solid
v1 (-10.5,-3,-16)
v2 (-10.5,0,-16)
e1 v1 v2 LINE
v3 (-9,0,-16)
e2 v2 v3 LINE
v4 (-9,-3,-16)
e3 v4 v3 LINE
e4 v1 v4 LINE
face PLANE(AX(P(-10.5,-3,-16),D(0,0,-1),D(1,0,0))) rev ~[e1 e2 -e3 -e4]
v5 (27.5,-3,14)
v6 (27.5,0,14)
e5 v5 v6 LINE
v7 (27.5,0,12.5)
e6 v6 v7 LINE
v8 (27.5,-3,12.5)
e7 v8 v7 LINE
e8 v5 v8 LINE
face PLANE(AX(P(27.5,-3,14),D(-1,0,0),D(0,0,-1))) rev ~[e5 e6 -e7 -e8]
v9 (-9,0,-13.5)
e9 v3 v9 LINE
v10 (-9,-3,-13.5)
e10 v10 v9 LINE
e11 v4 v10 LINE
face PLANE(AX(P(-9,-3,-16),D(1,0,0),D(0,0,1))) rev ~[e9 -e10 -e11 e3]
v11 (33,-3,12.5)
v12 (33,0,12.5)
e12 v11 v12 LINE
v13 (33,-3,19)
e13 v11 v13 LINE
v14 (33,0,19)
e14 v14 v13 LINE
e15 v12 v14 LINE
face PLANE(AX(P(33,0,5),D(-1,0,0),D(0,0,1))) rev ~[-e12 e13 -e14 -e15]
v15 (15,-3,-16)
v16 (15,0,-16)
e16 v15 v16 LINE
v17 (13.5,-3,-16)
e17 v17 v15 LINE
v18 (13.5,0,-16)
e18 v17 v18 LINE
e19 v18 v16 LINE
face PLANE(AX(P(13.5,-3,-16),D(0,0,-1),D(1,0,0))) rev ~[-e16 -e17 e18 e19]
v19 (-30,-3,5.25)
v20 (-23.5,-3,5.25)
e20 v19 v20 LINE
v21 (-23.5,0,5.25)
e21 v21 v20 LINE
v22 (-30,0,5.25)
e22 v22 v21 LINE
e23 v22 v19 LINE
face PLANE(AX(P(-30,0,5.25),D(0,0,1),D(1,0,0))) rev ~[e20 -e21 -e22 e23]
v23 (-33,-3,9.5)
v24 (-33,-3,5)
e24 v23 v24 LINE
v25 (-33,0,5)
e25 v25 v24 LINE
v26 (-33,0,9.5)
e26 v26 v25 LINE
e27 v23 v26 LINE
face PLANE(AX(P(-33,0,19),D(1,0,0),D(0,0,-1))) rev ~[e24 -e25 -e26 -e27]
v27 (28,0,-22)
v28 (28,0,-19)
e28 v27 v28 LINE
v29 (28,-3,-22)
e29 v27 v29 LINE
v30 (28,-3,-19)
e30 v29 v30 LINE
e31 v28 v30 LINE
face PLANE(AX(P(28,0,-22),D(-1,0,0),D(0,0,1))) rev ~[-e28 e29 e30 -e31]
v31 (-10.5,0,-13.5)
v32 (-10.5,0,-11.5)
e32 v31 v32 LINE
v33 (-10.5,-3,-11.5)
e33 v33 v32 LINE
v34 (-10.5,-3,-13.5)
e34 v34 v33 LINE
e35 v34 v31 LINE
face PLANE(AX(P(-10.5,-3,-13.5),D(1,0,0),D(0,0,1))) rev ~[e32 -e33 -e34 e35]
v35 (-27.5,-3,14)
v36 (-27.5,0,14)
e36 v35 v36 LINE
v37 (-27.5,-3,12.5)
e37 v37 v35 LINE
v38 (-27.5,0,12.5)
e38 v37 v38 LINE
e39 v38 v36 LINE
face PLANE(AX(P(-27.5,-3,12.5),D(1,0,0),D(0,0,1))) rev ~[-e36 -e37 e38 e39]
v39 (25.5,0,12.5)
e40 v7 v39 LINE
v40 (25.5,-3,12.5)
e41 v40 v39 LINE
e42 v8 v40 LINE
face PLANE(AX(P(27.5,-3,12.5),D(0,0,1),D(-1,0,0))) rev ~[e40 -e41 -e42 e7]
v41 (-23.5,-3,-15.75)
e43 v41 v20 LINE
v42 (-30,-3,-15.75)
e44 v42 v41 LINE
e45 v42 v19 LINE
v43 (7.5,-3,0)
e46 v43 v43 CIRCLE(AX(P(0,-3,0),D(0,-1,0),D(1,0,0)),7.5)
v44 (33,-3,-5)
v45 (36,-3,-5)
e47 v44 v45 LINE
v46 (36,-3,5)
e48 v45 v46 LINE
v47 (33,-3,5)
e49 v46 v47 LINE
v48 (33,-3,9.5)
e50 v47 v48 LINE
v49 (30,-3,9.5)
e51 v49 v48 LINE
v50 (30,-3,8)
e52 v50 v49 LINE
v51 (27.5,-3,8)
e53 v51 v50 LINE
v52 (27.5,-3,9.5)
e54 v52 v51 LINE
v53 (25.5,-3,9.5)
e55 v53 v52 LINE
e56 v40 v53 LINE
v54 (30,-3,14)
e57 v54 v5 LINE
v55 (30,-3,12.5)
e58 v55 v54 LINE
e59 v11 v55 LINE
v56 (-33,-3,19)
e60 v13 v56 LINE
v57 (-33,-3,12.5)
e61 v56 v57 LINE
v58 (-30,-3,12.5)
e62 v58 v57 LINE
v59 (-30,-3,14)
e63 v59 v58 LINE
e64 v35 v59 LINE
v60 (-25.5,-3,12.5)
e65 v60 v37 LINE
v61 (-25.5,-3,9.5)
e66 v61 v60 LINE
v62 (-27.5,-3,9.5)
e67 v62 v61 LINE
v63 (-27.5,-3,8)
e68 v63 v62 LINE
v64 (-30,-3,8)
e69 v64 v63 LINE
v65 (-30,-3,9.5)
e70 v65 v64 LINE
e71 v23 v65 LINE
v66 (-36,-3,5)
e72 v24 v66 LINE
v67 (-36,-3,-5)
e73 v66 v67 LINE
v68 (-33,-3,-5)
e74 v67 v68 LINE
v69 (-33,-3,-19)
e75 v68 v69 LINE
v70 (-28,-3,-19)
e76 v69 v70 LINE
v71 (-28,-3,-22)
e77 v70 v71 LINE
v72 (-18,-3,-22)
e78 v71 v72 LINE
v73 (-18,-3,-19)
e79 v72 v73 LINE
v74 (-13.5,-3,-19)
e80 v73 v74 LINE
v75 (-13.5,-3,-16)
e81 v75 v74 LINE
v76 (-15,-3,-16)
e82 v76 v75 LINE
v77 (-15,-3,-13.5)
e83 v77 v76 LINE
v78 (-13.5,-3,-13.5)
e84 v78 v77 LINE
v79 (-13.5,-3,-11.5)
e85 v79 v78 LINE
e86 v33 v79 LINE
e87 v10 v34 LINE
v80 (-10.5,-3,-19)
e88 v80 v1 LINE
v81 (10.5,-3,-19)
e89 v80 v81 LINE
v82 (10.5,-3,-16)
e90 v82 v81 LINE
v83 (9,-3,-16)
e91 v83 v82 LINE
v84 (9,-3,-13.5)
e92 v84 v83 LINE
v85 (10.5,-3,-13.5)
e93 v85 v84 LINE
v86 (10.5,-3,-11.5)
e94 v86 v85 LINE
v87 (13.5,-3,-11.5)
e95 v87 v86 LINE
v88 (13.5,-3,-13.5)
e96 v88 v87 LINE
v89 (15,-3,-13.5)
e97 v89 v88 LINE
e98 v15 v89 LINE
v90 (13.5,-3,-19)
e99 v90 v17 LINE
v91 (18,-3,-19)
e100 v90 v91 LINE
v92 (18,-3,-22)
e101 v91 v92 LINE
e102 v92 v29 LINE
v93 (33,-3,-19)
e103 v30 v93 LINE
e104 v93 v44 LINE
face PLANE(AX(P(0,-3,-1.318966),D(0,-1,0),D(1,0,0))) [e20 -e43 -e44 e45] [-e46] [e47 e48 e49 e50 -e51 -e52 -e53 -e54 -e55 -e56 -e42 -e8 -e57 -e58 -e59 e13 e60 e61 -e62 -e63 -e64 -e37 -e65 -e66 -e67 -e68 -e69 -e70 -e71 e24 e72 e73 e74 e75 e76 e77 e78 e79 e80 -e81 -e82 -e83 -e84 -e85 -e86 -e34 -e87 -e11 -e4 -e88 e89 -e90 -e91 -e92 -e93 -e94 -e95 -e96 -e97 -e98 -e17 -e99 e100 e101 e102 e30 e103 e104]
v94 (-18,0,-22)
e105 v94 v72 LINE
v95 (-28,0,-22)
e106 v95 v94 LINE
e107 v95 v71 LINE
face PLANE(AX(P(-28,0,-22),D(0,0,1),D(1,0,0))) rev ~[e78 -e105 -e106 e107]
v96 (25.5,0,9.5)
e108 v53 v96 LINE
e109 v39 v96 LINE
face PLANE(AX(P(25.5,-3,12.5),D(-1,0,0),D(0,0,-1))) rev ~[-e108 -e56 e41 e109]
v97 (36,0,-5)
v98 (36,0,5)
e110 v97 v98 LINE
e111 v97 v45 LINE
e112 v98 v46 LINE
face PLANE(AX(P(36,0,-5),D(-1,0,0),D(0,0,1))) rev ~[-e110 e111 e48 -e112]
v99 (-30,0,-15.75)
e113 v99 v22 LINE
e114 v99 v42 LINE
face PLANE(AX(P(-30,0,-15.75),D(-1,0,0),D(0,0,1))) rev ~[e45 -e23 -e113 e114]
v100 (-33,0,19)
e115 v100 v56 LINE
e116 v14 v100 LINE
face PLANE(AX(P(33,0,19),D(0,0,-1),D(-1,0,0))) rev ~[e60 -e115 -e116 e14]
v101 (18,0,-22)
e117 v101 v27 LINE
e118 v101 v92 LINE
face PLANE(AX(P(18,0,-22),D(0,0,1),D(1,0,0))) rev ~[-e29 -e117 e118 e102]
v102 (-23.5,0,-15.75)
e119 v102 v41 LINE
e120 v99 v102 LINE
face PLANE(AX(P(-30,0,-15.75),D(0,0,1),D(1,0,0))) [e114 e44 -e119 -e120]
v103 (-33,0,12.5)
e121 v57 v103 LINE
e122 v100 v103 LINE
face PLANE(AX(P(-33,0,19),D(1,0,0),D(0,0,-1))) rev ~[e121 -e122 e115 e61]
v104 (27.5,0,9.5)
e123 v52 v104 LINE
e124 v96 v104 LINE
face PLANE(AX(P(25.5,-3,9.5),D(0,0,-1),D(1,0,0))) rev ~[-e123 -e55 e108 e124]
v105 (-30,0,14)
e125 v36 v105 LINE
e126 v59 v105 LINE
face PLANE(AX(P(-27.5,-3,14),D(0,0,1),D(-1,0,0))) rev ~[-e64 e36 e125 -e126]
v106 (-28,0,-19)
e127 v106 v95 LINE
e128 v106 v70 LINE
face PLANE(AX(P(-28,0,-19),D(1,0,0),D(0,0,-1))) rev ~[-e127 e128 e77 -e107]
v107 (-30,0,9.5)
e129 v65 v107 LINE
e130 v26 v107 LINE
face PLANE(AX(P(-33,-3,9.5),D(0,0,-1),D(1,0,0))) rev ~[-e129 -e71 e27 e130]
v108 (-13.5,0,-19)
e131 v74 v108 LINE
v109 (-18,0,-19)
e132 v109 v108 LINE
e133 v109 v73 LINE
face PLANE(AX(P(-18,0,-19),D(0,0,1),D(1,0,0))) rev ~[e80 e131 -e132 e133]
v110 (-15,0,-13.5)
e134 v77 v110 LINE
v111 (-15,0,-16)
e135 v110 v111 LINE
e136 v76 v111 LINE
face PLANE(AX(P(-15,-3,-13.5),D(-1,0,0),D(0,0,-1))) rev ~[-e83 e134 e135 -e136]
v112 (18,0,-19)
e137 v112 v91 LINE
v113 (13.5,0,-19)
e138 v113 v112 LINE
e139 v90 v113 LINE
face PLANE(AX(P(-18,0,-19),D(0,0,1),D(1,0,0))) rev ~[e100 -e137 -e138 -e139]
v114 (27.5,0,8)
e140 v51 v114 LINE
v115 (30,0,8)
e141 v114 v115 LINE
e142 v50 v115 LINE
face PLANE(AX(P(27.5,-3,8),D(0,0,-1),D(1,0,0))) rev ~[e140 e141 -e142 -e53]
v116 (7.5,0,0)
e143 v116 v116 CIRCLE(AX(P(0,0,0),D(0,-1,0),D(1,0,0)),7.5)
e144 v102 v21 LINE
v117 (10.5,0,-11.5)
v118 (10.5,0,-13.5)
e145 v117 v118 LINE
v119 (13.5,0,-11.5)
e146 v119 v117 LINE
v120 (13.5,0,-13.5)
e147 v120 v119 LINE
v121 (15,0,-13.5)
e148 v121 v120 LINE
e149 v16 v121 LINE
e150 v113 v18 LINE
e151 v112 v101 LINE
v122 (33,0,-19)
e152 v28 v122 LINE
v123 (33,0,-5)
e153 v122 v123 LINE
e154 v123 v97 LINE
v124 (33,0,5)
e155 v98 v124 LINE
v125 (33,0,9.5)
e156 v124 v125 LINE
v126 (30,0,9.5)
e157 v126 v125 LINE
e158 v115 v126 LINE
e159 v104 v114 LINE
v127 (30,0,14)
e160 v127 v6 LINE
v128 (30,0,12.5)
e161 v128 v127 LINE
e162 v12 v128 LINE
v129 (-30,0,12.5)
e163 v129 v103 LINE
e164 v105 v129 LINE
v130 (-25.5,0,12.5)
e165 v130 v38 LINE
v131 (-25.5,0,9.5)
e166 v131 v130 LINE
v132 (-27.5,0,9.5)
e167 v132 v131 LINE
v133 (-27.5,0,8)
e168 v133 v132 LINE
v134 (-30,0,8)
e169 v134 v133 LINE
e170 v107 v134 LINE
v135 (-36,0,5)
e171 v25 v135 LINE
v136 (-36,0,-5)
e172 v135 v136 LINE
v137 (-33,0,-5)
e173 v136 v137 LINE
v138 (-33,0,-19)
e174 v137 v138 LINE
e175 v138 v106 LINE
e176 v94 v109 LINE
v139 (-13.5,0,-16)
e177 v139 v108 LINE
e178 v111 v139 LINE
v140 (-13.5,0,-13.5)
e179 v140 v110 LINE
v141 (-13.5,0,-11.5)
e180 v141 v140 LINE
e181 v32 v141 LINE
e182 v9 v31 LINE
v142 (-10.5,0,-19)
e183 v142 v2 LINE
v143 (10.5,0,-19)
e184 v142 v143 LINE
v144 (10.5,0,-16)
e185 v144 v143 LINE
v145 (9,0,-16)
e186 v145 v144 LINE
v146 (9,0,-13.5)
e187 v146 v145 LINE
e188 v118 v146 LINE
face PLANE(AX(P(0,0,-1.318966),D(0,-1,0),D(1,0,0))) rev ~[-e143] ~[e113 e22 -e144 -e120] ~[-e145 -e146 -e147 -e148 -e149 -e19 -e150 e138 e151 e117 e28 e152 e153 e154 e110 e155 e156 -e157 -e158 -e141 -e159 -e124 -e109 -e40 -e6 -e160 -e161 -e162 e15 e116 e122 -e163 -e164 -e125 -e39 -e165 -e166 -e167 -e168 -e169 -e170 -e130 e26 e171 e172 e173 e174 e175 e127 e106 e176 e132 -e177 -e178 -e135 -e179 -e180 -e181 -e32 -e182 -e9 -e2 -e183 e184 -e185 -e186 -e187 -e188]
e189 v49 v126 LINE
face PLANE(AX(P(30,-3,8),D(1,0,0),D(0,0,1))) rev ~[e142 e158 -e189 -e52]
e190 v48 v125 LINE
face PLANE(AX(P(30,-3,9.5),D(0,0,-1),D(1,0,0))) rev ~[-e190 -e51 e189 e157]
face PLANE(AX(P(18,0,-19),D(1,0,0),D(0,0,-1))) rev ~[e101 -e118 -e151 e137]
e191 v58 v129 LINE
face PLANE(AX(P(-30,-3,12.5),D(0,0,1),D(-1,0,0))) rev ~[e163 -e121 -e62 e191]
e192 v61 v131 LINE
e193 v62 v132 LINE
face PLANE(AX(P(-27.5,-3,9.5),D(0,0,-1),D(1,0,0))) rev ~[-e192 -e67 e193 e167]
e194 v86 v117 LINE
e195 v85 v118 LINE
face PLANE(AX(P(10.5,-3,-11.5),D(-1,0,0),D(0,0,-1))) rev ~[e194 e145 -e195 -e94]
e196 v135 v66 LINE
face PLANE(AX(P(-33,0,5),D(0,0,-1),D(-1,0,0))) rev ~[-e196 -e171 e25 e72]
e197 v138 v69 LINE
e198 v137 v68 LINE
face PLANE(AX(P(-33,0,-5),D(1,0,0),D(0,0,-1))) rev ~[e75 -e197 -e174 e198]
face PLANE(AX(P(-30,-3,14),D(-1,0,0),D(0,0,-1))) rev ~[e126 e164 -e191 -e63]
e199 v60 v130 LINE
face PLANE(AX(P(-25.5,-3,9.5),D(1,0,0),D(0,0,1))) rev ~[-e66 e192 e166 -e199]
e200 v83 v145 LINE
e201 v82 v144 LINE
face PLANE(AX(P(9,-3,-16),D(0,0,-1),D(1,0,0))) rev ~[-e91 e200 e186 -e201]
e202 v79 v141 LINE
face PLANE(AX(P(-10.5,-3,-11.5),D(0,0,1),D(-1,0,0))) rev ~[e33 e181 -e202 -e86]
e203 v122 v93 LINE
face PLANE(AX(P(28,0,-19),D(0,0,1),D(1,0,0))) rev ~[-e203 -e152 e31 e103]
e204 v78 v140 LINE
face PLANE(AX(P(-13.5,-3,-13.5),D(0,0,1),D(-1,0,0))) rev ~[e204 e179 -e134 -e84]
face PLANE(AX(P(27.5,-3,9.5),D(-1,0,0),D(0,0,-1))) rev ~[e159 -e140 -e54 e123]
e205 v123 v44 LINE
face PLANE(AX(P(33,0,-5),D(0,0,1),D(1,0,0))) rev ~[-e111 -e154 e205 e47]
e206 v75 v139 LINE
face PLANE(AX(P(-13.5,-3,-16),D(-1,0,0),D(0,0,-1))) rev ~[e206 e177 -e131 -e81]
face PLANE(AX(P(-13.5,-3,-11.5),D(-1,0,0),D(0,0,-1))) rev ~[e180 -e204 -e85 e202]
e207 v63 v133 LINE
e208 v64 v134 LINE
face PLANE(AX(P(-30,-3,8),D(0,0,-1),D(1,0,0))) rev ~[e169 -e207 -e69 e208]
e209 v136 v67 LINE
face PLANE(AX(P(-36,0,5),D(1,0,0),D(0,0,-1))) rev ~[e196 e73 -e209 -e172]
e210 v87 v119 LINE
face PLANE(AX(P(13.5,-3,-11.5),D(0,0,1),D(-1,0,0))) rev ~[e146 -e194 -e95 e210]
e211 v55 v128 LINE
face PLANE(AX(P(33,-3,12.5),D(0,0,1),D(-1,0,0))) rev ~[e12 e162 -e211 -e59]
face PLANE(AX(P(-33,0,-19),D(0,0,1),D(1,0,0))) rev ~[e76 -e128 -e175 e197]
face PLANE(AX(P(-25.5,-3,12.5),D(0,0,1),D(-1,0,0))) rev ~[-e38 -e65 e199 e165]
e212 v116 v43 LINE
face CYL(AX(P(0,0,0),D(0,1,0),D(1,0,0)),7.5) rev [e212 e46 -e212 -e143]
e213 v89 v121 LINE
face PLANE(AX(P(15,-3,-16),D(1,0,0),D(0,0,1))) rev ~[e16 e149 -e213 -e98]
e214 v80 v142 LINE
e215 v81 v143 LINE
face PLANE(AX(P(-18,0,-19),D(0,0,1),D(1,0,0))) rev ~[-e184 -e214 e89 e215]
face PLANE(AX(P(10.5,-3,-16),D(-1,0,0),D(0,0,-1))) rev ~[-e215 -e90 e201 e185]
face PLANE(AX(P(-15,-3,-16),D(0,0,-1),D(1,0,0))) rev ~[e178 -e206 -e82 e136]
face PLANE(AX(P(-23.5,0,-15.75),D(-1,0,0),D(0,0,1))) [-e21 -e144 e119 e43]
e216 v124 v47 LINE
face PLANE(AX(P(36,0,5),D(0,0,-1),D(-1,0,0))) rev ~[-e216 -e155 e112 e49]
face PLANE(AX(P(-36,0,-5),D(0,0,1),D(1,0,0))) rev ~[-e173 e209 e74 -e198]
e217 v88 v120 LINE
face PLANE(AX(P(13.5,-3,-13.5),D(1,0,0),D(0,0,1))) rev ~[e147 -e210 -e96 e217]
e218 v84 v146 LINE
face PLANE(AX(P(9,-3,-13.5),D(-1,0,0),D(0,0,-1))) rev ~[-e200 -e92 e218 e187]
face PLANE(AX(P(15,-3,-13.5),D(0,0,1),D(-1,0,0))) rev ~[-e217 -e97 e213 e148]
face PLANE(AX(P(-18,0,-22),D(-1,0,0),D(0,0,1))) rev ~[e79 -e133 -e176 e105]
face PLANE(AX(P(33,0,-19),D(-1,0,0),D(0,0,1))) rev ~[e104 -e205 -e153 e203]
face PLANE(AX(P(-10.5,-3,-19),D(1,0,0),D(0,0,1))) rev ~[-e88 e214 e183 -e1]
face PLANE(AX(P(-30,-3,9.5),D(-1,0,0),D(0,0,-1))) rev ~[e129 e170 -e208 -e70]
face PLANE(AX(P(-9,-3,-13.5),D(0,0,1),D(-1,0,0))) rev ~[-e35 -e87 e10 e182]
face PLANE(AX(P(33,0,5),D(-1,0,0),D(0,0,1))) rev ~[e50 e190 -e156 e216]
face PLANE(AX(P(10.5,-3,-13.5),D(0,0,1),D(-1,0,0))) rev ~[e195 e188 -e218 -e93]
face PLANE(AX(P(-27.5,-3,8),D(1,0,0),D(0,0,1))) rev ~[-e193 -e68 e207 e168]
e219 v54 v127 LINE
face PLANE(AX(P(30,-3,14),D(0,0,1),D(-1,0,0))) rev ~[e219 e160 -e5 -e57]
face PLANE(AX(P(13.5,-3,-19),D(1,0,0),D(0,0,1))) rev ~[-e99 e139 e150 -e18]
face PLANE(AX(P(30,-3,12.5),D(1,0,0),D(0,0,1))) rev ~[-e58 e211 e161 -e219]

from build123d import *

# Parameters (mm, degrees)
F1_W     = 6.5
F1_H     = 21
F1_R     = 7.5
F2_DEPTH = 3
F4_DEPTH = 3


# Not quite as in the source:
# - a feature names something its author has since deleted; it is built from what else it names


with BuildPart() as f2:
    # F1 (on Front) → F2 (new body)
    with BuildSketch(Plane.XZ):
        Polygon((33, 5), (33, 19), (-33, 19), (-33, 5), (-36, 5), (-36, -5), (-33, -5), (-33, -19), (-28, -19), (-28, -22), (-18, -22), (-18, -19), (0, -19), (18, -19), (18, -22), (28, -22), (28, -19), (33, -19), (33, -5), (36, -5), (36, 5), align=None)
        with Locations((-26.75, -5.25)):
            Rectangle(F1_W, F1_H, mode=Mode.SUBTRACT)
        Circle(F1_R, mode=Mode.SUBTRACT)
    extrude(amount=F2_DEPTH)

    # F3 (on face) → F4 (cut, through all)
    with BuildSketch(Plane.XZ.offset(3)):
        Polygon((10.5, -16), (10.5, -19), (13.5, -19), (13.5, -16), (15, -16), (15, -13.5), (13.5, -13.5), (13.5, -11.5), (10.5, -11.5), (10.5, -13.5), (9, -13.5), (9, -16), align=None)
        Polygon((-13.5, -19), (-10.5, -19), (-10.5, -16), (-9, -16), (-9, -13.5), (-10.5, -13.5), (-10.5, -11.5), (-13.5, -11.5), (-13.5, -13.5), (-15, -13.5), (-15, -16), (-13.5, -16), align=None)
        Polygon((30, 9.5), (33, 9.5), (33, 12.5), (30, 12.5), (30, 14), (27.5, 14), (27.5, 12.5), (25.5, 12.5), (25.5, 9.5), (27.5, 9.5), (27.5, 8), (30, 8), align=None)
        Polygon((-33, 12.5), (-33, 9.5), (-30, 9.5), (-30, 8), (-27.5, 8), (-27.5, 9.5), (-25.5, 9.5), (-25.5, 12.5), (-27.5, 12.5), (-27.5, 14), (-30, 14), (-30, 12.5), align=None)
    extrude(amount=-F4_DEPTH, mode=Mode.SUBTRACT)


solid = f2.part
